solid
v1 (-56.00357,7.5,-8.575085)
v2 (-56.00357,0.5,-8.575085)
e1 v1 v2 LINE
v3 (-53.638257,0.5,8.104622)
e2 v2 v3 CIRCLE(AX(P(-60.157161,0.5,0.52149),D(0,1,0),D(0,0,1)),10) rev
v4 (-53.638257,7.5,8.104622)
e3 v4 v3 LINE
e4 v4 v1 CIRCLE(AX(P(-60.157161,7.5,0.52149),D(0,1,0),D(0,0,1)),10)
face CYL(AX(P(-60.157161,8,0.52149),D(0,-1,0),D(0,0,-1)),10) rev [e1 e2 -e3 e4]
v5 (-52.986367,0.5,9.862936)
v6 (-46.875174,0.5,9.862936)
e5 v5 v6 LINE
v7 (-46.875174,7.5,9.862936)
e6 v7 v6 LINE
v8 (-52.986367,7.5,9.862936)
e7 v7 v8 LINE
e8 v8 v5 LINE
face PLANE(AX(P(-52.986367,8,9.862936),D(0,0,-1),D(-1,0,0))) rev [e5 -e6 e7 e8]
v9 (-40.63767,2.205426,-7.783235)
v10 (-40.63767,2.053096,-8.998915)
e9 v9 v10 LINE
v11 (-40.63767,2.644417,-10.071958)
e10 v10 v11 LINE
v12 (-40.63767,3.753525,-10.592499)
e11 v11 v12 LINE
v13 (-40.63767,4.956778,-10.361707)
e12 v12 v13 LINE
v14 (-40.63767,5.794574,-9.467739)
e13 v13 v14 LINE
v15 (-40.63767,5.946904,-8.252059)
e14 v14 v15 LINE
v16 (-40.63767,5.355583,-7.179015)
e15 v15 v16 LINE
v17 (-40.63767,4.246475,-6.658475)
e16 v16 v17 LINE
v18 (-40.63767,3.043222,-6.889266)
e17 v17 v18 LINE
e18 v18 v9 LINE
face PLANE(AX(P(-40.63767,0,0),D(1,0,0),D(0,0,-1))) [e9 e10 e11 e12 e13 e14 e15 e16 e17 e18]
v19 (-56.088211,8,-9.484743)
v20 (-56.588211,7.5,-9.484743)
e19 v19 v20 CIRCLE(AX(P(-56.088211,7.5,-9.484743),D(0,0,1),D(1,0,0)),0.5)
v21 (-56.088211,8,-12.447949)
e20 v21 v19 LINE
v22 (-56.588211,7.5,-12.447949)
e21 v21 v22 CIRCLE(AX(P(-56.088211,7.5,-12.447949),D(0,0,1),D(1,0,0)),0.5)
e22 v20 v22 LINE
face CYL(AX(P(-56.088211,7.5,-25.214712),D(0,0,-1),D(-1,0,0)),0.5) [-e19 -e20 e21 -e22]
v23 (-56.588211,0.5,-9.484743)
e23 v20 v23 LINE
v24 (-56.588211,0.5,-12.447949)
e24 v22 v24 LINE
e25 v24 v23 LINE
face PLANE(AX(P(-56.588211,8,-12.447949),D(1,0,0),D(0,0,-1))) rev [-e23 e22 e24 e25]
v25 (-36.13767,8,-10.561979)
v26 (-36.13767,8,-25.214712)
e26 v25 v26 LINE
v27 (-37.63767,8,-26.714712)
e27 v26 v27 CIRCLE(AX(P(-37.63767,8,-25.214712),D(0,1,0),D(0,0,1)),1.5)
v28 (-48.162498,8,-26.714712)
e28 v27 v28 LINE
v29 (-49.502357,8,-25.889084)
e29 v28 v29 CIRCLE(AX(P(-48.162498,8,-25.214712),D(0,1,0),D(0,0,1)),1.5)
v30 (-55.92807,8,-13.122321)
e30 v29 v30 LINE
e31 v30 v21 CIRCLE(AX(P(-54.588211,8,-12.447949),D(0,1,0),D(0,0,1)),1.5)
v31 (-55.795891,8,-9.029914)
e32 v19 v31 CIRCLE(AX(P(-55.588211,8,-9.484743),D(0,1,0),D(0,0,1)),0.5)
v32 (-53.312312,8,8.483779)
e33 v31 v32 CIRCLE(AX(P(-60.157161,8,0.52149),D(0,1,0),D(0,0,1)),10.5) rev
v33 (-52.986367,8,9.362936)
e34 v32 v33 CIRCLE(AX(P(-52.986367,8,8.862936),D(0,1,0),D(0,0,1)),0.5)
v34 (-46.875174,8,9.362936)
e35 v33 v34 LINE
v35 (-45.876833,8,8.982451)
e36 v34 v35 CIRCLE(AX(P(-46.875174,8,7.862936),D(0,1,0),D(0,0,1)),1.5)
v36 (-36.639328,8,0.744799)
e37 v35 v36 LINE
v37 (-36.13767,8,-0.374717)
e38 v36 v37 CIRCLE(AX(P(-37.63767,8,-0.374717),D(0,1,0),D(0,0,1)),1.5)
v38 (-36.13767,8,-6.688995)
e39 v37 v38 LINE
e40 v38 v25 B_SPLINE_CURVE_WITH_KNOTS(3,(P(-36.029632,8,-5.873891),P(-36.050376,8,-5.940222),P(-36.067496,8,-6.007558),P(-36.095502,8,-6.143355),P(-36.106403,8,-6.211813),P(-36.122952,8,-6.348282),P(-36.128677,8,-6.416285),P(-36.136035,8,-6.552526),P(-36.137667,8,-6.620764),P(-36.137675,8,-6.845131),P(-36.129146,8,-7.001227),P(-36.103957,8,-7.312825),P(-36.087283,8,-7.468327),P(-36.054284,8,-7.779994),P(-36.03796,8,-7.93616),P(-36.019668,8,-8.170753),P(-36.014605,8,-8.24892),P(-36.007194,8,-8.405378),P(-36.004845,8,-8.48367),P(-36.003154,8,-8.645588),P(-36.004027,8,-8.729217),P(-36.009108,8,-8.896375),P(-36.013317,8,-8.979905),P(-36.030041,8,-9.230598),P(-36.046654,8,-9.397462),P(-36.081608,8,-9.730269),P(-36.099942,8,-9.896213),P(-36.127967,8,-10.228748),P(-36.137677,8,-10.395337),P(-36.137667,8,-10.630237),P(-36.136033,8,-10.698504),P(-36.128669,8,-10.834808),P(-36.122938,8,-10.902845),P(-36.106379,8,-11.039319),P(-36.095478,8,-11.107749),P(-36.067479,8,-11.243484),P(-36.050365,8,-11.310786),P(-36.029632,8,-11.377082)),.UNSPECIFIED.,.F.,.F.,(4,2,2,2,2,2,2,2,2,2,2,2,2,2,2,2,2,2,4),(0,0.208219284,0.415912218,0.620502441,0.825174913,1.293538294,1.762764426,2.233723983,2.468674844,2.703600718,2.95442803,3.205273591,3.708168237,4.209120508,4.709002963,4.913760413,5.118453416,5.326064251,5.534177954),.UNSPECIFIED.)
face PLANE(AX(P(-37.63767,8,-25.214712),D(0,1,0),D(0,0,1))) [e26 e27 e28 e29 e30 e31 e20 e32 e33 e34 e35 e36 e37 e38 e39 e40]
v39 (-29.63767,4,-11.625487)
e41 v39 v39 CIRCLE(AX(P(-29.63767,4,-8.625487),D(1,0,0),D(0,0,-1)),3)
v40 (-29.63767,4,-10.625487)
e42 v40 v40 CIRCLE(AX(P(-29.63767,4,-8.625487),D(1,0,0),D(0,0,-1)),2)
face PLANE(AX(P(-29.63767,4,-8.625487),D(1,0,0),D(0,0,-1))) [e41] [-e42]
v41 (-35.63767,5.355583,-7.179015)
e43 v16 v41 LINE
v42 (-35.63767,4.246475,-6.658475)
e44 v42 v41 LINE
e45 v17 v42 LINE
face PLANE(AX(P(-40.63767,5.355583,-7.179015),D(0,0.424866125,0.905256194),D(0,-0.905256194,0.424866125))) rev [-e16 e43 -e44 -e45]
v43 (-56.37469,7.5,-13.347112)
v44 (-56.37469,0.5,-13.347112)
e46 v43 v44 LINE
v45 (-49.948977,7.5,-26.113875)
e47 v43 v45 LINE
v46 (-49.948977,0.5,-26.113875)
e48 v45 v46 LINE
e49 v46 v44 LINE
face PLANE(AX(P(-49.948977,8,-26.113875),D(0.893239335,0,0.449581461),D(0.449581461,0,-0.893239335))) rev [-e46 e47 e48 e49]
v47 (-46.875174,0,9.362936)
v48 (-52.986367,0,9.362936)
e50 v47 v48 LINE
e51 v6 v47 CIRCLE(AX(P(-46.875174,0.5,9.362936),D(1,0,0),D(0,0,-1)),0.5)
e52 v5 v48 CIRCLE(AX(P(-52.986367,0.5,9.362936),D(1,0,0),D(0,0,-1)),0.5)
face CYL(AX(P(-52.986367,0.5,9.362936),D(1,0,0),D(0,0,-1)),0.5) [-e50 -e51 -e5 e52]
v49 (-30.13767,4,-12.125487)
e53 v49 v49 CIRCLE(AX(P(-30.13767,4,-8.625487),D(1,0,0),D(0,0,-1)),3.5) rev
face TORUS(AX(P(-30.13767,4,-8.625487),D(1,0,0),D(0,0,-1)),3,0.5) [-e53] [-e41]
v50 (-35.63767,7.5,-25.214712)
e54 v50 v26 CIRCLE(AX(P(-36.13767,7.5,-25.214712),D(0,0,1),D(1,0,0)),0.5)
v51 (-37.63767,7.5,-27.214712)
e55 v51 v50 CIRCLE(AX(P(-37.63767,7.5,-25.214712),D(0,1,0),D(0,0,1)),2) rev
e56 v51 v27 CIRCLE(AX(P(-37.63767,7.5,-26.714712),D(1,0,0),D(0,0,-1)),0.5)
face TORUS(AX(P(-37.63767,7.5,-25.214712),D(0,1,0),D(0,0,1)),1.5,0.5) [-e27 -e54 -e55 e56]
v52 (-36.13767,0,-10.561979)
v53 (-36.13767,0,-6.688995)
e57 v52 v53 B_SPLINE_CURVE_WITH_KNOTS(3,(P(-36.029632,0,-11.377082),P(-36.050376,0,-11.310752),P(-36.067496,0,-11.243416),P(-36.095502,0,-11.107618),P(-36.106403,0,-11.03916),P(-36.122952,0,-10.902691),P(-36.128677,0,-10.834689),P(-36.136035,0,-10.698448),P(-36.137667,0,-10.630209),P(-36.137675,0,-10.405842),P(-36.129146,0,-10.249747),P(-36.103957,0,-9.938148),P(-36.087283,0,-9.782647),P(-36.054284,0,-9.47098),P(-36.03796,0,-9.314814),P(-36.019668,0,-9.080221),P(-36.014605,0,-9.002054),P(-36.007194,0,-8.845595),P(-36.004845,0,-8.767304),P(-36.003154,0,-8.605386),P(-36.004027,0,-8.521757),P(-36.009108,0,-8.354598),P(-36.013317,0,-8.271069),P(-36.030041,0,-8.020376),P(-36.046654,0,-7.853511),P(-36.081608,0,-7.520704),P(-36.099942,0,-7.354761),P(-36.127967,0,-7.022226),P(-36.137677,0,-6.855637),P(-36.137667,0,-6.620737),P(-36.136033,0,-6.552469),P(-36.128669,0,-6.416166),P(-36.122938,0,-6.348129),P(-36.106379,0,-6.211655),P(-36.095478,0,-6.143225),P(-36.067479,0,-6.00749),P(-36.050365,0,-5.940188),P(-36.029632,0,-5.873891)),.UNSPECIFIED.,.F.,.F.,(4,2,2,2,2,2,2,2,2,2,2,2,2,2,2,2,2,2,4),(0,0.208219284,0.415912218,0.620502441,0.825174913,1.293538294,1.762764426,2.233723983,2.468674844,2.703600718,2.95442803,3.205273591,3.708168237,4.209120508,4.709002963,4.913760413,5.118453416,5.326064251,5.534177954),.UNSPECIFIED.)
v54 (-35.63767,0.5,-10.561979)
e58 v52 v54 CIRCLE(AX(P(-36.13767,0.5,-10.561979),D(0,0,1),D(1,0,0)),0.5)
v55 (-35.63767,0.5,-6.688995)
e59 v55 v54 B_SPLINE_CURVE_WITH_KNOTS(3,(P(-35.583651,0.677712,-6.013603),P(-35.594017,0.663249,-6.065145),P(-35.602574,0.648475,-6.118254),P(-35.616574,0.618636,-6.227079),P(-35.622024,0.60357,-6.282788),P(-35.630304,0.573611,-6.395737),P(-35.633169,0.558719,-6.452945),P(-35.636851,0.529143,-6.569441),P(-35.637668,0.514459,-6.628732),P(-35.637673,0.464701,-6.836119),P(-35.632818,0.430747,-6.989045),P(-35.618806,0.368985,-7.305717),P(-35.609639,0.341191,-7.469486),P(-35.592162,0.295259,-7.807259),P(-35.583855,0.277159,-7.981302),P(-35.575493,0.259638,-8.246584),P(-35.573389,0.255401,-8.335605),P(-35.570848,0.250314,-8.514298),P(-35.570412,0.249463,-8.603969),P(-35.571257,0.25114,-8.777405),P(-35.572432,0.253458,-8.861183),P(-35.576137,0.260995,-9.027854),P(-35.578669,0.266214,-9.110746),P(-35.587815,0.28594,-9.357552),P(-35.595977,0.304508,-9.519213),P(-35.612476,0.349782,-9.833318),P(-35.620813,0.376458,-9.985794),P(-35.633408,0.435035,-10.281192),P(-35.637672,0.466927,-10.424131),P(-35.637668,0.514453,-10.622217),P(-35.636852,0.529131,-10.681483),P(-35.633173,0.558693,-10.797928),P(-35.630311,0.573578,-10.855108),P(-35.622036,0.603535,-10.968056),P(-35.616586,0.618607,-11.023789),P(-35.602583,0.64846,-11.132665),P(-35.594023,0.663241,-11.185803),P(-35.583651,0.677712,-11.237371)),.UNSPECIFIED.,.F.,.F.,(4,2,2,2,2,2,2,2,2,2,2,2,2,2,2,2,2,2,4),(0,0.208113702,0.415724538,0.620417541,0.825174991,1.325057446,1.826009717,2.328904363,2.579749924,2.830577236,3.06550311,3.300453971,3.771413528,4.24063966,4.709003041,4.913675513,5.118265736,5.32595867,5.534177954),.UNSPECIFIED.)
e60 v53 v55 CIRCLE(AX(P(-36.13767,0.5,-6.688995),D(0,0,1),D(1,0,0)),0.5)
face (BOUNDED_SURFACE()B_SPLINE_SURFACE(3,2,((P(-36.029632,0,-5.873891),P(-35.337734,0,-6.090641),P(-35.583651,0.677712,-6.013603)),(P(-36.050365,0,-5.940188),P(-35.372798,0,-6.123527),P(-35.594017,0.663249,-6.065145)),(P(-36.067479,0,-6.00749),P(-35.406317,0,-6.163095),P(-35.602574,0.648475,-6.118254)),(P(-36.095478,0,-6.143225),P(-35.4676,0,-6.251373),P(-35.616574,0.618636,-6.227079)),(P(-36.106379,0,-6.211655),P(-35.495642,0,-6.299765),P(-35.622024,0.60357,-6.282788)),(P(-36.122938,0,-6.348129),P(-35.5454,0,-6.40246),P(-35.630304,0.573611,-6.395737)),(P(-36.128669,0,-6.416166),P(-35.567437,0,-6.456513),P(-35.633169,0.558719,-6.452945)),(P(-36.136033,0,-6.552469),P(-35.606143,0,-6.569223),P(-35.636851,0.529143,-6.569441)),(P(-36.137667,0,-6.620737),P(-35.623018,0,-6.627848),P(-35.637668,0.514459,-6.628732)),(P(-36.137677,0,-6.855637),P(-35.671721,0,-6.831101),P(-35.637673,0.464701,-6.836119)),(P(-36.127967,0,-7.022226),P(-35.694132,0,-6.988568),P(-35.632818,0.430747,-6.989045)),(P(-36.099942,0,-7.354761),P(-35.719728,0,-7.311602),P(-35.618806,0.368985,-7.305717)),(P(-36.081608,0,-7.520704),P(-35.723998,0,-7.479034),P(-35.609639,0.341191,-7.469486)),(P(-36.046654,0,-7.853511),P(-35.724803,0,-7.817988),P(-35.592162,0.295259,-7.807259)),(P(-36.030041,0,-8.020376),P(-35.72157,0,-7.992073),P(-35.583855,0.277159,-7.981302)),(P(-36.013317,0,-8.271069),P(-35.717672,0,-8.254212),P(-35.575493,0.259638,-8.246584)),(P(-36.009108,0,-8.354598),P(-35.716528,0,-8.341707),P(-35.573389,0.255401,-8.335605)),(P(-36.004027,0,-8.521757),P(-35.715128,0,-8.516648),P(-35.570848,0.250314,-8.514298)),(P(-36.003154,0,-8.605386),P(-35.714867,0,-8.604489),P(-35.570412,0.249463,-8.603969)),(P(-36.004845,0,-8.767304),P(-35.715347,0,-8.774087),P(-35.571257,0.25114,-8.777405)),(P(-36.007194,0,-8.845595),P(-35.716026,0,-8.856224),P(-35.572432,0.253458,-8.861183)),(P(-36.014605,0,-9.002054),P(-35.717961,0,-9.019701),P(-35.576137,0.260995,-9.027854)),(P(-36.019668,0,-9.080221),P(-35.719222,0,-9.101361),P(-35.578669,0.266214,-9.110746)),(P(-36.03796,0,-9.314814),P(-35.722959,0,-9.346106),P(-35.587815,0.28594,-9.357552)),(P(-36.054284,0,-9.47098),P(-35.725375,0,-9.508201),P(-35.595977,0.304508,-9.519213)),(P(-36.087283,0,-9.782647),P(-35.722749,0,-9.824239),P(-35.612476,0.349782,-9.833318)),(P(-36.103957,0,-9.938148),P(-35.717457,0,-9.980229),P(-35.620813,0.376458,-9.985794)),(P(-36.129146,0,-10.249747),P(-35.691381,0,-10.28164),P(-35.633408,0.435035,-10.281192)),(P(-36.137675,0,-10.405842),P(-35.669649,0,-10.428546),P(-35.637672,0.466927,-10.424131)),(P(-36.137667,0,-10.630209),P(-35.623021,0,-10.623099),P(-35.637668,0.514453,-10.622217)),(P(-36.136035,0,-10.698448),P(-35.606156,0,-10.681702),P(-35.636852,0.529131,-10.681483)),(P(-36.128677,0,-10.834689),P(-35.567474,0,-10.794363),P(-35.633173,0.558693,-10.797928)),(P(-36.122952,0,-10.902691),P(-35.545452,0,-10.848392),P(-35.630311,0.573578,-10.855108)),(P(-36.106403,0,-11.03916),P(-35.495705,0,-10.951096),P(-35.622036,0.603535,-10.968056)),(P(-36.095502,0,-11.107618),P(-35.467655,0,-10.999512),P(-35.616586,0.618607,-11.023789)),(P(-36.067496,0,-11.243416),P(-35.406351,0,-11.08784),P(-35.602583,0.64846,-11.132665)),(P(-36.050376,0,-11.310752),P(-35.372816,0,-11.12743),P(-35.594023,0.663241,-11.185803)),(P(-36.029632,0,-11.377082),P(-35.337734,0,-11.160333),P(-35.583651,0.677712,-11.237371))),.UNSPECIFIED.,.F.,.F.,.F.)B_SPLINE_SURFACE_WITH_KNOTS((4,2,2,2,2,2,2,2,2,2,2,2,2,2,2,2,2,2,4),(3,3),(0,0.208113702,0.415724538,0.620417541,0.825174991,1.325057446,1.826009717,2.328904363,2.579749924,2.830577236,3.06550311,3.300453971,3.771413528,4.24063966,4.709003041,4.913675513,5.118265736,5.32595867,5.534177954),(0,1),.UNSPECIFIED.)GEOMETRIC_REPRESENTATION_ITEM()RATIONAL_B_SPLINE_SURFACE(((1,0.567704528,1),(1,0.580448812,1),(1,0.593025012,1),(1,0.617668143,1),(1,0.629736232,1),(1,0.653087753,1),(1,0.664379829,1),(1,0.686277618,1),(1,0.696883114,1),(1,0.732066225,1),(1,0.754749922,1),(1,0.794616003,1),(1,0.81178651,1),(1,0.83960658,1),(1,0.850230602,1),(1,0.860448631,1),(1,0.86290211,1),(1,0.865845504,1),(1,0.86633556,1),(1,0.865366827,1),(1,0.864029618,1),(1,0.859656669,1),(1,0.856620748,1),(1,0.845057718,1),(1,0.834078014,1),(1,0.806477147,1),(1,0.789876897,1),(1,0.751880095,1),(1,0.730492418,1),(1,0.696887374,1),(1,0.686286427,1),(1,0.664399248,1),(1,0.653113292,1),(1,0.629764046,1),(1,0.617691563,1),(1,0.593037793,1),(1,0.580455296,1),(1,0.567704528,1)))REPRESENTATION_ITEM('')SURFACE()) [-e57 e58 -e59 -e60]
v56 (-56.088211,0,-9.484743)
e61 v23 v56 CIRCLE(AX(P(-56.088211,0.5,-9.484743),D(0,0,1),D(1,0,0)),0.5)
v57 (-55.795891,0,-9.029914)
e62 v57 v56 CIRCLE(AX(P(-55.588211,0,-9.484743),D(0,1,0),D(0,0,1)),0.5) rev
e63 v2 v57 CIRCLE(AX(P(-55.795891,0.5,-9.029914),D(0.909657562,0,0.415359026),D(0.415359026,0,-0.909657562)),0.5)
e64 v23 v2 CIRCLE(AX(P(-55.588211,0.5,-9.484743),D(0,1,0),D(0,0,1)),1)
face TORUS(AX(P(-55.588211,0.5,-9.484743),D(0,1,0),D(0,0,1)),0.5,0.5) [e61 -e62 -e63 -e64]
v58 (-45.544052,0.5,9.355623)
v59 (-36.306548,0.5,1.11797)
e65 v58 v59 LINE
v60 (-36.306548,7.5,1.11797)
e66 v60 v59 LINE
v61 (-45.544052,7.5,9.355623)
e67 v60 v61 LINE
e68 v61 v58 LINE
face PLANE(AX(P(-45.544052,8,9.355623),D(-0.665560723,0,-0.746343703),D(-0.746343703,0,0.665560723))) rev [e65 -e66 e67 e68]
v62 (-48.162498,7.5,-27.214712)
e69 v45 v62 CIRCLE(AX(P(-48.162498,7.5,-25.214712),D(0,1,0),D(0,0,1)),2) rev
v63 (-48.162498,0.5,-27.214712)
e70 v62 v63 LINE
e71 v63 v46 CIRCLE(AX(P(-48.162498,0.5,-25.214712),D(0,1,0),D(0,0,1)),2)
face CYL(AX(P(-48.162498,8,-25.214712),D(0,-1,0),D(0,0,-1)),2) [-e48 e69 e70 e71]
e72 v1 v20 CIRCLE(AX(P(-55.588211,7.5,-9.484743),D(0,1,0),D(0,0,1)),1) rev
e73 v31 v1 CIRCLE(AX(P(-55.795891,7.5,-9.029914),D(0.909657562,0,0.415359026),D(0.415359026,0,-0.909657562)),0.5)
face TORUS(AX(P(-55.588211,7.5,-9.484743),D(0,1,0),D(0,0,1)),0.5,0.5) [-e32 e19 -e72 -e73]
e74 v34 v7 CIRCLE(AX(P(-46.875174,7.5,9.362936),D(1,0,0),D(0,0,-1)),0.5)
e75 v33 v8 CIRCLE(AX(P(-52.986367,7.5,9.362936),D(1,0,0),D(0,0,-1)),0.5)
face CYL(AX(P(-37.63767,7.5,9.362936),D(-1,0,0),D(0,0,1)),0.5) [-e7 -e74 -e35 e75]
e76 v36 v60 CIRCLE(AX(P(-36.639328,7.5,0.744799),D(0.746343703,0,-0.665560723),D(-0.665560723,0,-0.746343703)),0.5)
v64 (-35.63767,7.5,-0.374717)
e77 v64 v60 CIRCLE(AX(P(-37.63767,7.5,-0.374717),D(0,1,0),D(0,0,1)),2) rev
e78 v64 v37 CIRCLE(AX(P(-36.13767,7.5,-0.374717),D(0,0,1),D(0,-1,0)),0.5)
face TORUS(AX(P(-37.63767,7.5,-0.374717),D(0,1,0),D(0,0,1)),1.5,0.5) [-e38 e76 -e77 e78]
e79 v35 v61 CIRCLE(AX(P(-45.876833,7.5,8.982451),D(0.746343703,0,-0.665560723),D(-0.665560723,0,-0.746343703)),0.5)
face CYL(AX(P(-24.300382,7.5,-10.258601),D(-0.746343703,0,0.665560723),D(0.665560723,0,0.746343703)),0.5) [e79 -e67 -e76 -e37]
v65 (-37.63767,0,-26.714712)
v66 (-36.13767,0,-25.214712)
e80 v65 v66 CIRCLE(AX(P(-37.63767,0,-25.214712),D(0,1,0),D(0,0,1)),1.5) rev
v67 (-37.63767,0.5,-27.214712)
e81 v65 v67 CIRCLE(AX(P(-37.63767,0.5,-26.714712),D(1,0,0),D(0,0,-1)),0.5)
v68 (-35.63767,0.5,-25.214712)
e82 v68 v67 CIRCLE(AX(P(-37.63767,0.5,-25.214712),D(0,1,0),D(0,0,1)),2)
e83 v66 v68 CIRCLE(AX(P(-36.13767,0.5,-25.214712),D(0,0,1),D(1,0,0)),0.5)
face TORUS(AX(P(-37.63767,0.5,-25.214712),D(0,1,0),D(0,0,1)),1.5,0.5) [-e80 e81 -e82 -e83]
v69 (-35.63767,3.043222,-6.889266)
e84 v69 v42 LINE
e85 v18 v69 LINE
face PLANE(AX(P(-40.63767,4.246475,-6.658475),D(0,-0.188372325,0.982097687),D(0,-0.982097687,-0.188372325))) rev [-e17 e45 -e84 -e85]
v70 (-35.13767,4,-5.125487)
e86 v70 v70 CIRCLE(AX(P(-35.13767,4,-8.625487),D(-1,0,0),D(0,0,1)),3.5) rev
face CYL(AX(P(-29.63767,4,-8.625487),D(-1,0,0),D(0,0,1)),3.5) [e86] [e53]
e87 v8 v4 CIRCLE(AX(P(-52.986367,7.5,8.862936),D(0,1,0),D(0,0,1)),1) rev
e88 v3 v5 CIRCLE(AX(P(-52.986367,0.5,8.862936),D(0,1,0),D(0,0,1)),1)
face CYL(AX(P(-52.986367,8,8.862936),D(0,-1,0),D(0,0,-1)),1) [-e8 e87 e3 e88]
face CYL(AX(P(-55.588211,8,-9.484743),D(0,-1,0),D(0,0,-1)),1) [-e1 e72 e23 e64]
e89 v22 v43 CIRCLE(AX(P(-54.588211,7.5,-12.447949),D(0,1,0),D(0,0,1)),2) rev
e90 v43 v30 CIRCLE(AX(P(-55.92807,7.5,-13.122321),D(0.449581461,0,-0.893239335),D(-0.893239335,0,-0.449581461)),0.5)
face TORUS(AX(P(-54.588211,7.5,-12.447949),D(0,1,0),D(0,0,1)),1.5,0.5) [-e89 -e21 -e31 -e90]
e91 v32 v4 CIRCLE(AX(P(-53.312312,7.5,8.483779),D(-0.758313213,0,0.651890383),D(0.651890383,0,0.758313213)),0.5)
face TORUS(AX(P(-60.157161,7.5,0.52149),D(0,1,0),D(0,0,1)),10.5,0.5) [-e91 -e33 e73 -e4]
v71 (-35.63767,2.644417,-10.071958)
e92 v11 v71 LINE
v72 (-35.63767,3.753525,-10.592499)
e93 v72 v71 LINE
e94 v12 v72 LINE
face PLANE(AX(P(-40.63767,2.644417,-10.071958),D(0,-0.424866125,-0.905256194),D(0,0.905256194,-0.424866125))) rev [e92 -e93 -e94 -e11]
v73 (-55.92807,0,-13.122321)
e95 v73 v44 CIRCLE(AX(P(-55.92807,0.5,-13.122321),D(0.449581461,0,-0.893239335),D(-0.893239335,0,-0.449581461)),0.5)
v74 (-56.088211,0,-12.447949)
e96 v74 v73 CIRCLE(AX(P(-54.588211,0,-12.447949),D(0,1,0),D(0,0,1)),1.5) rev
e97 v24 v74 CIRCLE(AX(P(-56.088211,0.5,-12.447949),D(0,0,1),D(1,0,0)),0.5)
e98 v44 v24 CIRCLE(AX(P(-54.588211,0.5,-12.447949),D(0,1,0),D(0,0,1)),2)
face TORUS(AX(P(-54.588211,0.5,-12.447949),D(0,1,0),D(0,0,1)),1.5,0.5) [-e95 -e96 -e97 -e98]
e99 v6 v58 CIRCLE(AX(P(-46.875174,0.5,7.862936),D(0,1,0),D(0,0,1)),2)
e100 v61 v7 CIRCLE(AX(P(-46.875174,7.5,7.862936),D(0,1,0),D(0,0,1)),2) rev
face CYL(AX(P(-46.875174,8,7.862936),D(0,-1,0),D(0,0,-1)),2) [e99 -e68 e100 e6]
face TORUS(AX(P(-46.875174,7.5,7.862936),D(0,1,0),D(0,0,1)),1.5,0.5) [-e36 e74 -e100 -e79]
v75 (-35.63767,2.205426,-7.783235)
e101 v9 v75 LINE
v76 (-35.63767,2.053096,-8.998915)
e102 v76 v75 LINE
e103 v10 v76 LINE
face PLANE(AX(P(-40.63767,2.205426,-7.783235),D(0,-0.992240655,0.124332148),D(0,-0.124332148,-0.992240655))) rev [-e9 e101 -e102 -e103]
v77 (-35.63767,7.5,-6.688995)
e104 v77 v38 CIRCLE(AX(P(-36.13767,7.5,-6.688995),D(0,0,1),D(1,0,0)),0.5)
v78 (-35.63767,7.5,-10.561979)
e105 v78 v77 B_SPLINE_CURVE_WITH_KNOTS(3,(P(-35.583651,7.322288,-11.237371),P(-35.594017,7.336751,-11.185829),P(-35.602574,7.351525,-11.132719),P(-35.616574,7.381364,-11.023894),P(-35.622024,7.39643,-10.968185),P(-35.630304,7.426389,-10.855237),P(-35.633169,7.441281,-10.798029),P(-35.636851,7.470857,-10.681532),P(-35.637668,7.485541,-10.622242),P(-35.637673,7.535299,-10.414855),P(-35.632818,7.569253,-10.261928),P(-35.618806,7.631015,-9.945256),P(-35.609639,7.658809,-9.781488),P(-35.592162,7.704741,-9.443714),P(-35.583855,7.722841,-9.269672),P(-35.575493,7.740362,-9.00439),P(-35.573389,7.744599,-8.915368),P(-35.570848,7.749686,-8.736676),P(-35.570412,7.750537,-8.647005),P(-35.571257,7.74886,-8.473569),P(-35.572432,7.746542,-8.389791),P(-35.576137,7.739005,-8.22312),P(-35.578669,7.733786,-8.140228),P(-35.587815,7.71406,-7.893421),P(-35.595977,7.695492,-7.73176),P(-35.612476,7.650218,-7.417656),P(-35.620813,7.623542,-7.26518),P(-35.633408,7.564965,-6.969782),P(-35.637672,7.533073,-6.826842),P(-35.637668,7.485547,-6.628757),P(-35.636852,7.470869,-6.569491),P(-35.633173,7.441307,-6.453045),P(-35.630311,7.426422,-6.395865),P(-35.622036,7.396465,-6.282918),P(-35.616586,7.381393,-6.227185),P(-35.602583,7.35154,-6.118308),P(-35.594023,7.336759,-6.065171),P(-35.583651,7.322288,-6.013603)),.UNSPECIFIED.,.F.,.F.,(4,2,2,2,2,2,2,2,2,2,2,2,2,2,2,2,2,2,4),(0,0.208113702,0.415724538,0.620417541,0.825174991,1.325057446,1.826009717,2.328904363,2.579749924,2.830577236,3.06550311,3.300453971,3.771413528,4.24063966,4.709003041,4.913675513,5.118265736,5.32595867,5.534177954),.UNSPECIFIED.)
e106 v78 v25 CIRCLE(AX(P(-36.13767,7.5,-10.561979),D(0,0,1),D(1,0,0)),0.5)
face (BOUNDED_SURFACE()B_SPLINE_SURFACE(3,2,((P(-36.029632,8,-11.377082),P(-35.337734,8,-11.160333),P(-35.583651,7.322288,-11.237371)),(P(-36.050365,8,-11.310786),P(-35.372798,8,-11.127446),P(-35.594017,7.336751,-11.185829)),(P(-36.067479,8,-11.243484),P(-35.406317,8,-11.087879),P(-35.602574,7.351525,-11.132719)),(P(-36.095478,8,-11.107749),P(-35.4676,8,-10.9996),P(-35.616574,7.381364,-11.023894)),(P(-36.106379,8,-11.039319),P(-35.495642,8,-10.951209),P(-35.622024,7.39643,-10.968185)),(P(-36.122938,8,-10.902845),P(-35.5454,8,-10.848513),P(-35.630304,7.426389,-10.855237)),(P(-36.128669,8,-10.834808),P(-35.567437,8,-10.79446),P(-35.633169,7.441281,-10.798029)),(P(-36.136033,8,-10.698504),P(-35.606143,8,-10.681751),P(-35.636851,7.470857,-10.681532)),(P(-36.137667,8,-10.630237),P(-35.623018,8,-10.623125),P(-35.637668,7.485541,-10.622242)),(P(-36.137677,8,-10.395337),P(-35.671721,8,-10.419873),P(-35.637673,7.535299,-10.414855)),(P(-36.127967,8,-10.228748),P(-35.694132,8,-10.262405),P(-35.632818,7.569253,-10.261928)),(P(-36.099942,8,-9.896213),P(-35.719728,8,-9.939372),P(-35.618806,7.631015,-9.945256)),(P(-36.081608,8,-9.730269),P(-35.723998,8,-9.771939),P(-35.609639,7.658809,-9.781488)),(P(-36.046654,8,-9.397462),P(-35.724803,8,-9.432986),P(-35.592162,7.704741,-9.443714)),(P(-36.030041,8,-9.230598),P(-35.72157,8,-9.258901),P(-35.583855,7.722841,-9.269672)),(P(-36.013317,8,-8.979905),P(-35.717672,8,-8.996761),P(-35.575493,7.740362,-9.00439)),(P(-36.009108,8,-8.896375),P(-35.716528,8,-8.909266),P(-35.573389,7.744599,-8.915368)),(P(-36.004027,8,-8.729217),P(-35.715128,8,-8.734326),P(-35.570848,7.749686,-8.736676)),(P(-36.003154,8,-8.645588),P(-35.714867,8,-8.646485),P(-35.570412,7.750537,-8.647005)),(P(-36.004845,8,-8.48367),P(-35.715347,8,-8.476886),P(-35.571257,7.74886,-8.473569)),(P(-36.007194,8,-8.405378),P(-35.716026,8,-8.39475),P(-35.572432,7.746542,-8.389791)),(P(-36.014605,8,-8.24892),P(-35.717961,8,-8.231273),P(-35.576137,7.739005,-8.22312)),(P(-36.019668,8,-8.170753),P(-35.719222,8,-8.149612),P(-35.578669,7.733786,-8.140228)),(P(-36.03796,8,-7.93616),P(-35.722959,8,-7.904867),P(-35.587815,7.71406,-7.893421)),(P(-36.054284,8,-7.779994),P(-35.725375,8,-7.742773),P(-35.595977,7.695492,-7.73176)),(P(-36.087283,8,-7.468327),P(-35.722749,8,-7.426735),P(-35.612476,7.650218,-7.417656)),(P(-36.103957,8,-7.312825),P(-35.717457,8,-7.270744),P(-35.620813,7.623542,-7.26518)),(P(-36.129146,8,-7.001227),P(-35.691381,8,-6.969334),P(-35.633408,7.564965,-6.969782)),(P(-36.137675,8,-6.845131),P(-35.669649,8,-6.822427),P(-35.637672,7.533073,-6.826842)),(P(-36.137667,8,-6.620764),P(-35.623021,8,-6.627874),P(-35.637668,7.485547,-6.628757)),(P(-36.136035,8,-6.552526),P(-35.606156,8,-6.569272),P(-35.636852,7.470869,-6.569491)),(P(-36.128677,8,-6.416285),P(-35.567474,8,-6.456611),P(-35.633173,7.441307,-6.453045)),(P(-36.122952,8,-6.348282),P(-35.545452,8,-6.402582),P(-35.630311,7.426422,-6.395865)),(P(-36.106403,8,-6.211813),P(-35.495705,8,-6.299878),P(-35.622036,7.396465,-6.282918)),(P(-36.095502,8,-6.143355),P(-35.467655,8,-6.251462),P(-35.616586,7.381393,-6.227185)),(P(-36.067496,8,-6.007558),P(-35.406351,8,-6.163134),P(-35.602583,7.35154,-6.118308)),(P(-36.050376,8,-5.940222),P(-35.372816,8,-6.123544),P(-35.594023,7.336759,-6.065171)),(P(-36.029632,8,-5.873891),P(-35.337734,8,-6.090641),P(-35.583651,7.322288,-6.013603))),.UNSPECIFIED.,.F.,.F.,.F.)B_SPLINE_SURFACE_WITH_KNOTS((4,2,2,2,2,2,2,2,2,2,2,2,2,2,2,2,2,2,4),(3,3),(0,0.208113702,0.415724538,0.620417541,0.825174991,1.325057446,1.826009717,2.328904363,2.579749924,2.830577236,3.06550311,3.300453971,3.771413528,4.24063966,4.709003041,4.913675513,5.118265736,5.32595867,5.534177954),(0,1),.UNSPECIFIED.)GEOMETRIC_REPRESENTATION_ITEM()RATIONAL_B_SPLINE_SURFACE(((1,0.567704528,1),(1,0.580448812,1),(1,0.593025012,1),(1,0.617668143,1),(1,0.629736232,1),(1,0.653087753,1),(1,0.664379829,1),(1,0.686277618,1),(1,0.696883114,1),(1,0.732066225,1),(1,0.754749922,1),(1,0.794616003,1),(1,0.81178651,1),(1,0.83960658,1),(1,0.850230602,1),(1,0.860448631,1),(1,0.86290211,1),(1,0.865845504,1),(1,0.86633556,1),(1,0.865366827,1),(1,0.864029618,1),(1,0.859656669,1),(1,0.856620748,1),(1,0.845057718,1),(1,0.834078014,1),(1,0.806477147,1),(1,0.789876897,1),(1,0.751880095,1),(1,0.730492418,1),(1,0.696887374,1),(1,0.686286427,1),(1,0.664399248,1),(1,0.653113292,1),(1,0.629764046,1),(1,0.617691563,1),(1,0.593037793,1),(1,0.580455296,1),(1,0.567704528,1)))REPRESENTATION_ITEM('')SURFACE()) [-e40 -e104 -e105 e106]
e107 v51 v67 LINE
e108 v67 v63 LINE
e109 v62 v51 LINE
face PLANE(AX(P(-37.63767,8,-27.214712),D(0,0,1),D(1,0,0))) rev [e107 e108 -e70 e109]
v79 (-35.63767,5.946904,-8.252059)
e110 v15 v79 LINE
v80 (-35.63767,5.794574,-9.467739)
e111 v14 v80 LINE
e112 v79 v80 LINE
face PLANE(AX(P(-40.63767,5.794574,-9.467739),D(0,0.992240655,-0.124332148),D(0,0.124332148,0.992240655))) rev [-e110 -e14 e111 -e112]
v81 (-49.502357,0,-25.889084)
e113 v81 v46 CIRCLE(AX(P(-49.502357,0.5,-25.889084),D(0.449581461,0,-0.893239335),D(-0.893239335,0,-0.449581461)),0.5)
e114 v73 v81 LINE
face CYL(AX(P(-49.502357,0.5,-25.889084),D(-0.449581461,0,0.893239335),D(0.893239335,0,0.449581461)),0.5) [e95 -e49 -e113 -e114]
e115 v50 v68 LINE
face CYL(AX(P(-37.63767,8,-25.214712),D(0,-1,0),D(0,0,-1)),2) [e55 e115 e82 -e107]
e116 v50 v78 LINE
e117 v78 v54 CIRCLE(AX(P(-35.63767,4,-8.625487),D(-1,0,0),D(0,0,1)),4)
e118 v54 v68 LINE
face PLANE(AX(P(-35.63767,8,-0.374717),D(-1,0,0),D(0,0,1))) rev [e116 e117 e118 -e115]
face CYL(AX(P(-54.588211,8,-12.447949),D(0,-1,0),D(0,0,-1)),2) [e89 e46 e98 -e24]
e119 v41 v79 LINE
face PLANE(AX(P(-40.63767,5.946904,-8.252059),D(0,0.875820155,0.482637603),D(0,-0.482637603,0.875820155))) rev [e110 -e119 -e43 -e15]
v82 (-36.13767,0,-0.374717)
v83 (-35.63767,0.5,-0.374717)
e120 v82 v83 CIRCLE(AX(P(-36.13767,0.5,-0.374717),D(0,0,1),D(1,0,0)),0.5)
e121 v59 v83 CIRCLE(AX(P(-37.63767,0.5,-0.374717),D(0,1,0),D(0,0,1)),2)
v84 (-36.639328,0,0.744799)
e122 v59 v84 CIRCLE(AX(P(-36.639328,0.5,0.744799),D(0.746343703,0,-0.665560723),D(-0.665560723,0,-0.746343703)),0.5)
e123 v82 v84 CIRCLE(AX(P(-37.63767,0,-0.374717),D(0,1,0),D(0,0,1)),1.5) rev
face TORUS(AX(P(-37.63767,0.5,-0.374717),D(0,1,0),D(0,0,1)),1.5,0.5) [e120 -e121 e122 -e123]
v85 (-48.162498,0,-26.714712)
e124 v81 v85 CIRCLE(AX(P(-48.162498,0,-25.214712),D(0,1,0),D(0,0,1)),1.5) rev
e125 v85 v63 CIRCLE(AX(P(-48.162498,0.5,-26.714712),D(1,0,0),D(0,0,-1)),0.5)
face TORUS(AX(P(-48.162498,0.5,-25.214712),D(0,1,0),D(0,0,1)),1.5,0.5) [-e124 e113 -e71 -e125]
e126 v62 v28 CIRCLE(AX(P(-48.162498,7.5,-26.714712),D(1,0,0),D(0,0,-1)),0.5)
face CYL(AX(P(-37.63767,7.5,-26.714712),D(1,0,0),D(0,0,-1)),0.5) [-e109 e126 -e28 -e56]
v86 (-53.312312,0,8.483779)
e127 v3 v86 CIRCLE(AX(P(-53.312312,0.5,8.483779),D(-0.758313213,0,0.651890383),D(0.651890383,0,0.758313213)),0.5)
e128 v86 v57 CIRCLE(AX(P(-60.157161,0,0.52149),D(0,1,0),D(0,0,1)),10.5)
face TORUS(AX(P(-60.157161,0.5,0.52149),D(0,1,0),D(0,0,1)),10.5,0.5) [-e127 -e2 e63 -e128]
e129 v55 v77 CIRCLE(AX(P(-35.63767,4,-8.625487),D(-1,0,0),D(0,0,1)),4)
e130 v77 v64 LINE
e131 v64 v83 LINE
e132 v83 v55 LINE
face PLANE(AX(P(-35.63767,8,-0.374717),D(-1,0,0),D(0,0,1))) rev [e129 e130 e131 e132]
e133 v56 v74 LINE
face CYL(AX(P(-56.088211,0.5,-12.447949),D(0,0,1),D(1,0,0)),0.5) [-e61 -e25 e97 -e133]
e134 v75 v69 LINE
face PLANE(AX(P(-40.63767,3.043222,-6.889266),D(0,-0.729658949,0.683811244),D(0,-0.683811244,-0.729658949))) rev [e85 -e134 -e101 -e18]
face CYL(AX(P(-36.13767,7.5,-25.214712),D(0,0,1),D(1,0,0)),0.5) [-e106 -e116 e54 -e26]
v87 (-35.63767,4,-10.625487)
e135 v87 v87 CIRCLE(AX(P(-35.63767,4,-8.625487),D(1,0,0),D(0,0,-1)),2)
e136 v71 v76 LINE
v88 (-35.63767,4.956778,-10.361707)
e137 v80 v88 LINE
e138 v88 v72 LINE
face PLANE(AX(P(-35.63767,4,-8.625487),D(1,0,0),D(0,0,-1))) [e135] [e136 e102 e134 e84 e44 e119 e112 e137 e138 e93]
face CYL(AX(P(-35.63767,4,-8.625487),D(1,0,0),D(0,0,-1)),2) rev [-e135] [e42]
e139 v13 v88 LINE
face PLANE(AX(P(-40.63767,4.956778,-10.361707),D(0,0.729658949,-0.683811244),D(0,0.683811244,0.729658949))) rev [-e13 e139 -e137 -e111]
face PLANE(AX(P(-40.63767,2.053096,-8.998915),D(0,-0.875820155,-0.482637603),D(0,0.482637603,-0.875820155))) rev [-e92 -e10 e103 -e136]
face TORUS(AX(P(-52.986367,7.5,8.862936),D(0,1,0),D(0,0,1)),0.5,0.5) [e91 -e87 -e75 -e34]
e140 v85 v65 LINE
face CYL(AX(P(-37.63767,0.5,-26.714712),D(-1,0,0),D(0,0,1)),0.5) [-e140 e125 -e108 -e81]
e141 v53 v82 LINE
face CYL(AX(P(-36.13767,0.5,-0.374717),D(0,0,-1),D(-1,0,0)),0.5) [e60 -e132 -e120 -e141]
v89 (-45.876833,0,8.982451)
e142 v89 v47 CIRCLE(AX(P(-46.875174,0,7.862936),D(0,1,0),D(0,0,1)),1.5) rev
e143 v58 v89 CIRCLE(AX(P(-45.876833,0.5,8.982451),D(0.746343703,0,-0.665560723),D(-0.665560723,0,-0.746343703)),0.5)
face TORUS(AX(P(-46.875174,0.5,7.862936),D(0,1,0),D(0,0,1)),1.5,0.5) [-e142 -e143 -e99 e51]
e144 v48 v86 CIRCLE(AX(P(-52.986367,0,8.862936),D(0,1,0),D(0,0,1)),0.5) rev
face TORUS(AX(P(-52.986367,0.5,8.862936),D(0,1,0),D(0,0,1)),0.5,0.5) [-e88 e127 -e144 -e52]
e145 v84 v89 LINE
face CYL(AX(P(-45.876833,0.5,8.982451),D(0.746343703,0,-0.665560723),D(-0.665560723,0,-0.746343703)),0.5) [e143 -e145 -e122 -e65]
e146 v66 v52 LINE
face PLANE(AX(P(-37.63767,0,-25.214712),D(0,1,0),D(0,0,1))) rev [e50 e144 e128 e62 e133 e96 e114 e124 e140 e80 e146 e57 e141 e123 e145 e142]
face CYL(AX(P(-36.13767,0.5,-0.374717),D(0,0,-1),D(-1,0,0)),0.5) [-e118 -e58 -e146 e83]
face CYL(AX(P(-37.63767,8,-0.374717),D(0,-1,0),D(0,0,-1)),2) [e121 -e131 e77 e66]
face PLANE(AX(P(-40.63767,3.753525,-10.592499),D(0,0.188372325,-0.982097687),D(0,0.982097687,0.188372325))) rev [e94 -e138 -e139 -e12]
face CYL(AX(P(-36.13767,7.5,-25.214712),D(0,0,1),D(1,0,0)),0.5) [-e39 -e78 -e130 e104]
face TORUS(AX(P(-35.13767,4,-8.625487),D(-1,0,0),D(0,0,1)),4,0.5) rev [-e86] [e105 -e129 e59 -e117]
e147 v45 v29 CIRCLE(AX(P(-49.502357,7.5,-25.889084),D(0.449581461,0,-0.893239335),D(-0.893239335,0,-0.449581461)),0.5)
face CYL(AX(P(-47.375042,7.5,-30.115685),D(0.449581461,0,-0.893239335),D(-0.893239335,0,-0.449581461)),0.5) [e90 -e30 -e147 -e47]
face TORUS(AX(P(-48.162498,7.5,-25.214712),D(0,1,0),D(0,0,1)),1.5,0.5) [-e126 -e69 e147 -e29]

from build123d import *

# Parameters (mm, degrees)
BOSS_EXTRUDE3_DEPTH = 8
SKETCH5_R           = 3.5
BOSS_EXTRUDE4_DEPTH = 6
CUT_EXTRUDE4_DEPTH  = 11
SKETCH8_R           = 2
CUT_EXTRUDE6_DEPTH  = 6
FILLET4_R           = 0.5
FILLET5_R           = 0.5
FILLET6_R           = 0.5
FILLET7_R           = 0.5


with BuildPart() as part:
    # Sketch2 → Boss-Extrude3 (new body)
    with BuildSketch(Plane(origin=(0, 0, 0), x_dir=(1, 0, 0), z_dir=(0, 1, 0))):
        with BuildLine():
            Line((-52.986366507, -9.86293556), (-46.875173859, -9.86293556))
            ThreePointArc((-46.875173859, -9.86293556), (-46.162915062, -9.731808859), (-45.544052412, -9.355622967))
            Line((-45.544052412, -9.355622967), (-36.306548093, -1.117970492))
            ThreePointArc((-36.306548093, -1.117970492), (-35.812533532, -0.443133043), (-35.63766954, 0.374716915))
            Line((-35.63766954, 0.374716915), (-35.63766954, 25.214712135))
            ThreePointArc((-35.63766954, 25.214712135), (-36.223455977, 26.628925698), (-37.63766954, 27.214712135))
            Line((-37.63766954, 27.214712135), (-48.162498073, 27.214712135))
            ThreePointArc((-48.162498073, 27.214712135), (-49.211705906, 26.91740498), (-49.948976743, 26.113875058))
            Line((-49.948976743, 26.113875058), (-56.374690107, 13.347112122))
            ThreePointArc((-56.374690107, 13.347112122), (-56.534099068, 12.910032882), (-56.588211437, 12.4479492))
            Line((-56.588211437, 12.4479492), (-56.588211437, 9.484742958))
            ThreePointArc((-56.588211437, 9.484742958), (-56.429448332, 8.944076251), (-56.003570463, 8.575085396))
            ThreePointArc((-56.003570463, 8.575085396), (-50.256216568, 0.882541429), (-53.63825689, -8.104622347))
            ThreePointArc((-53.63825689, -8.104622347), (-53.924000021, -9.210560924), (-52.986366507, -9.86293556))
        make_face()
    extrude(amount=BOSS_EXTRUDE3_DEPTH)

    # Sketch5 → Boss-Extrude4 (add)
    with BuildSketch(Plane(origin=(-35.63766954, 0, 0), x_dir=(0, 0, -1), z_dir=(1, 0, 0))):
        with Locations(Location((8.625486842, 4, 0), (0, 0, 180))):
            Circle(SKETCH5_R)
    extrude(amount=BOSS_EXTRUDE4_DEPTH)

    # Sketch6 → Cut-Extrude4 (cut)
    with BuildSketch(Plane(origin=(-29.63766954, 0, 0), x_dir=(0, 0, -1), z_dir=(1, 0, 0))):
        Polygon((9.467738832, 5.794574307), (8.252058704, 5.946904411), (7.179015432, 5.355583202), (6.658475074, 4.246475285), (6.889266356, 3.043222187), (7.783234851, 2.205425693), (8.99891498, 2.053095589), (10.071958252, 2.644416798), (10.592498609, 3.753524715), (10.361707327, 4.956777813), align=None)
    extrude(amount=-CUT_EXTRUDE4_DEPTH, mode=Mode.SUBTRACT)

    # Sketch8 → Cut-Extrude6 (cut)
    with BuildSketch(Plane(origin=(-29.63766954, 0, 0), x_dir=(0, 0, -1), z_dir=(1, 0, 0))):
        with Locations((8.625486842, 4)):
            Circle(SKETCH8_R)
    extrude(amount=-CUT_EXTRUDE6_DEPTH, mode=Mode.SUBTRACT)

    # Fillet4
    fillet4_edges = [part.edges().sort_by_distance(p)[0] for p in [
        (-29.63766954, 4, -12.125486842),
    ]]
    fillet(fillet4_edges, radius=FILLET4_R)

    # Fillet5
    fillet5_edges = [part.edges().sort_by_distance(p)[0] for p in [
        (-35.63766954, 4, -12.125486842),
    ]]
    fillet(fillet5_edges, radius=FILLET5_R - 0.0001)  # a hair under: the kernel refuses the full size

    # Fillet6
    fillet6_edges = [part.edges().sort_by_distance(p)[0] for p in [
        (-35.63766954, 8, -12.794714525),
        (-49.211705906, 8, -26.91740498),
        (-53.161833425, 8, -19.73049359),
        (-56.534099068, 8, -12.910032882),
        (-56.588211437, 8, -10.966346079),
        (-56.429448332, 8, -8.944076251),
        (-50.256216568, 8, -0.882541429),
        (-53.924000021, 8, 9.210560924),
        (-49.930770183, 8, 9.86293556),
        (-46.162915062, 8, 9.731808859),
        (-40.925300253, 8, 5.236796729),
        (-36.223455977, 8, -26.628925698),
        (-35.812533532, 8, 0.443133043),
        (-35.63766954, 8, -12.794714525),
        (-42.900083806, 8, -27.214712135),
    ]]
    fillet(fillet6_edges, radius=FILLET6_R)

    # Fillet7
    fillet7_edges = [part.edges().sort_by_distance(p)[0] for p in [
        (-35.63766954, 0, -12.794714525),
        (-35.63766954, 0, -12.794714525),
        (-35.812533532, 0, 0.443133043),
        (-40.925300253, 0, 5.236796729),
        (-46.162915062, 0, 9.731808859),
        (-49.930770183, 0, 9.86293556),
        (-53.924000021, 0, 9.210560924),
        (-50.256216568, 0, -0.882541429),
        (-56.429448332, 0, -8.944076251),
        (-56.588211437, 0, -10.966346079),
        (-56.534099068, 0, -12.910032882),
        (-53.161833425, 0, -19.73049359),
        (-49.211705906, 0, -26.91740498),
        (-42.900083806, 0, -27.214712135),
        (-36.223455977, 0, -26.628925698),
    ]]
    fillet(fillet7_edges, radius=FILLET7_R)


solid = part.part
